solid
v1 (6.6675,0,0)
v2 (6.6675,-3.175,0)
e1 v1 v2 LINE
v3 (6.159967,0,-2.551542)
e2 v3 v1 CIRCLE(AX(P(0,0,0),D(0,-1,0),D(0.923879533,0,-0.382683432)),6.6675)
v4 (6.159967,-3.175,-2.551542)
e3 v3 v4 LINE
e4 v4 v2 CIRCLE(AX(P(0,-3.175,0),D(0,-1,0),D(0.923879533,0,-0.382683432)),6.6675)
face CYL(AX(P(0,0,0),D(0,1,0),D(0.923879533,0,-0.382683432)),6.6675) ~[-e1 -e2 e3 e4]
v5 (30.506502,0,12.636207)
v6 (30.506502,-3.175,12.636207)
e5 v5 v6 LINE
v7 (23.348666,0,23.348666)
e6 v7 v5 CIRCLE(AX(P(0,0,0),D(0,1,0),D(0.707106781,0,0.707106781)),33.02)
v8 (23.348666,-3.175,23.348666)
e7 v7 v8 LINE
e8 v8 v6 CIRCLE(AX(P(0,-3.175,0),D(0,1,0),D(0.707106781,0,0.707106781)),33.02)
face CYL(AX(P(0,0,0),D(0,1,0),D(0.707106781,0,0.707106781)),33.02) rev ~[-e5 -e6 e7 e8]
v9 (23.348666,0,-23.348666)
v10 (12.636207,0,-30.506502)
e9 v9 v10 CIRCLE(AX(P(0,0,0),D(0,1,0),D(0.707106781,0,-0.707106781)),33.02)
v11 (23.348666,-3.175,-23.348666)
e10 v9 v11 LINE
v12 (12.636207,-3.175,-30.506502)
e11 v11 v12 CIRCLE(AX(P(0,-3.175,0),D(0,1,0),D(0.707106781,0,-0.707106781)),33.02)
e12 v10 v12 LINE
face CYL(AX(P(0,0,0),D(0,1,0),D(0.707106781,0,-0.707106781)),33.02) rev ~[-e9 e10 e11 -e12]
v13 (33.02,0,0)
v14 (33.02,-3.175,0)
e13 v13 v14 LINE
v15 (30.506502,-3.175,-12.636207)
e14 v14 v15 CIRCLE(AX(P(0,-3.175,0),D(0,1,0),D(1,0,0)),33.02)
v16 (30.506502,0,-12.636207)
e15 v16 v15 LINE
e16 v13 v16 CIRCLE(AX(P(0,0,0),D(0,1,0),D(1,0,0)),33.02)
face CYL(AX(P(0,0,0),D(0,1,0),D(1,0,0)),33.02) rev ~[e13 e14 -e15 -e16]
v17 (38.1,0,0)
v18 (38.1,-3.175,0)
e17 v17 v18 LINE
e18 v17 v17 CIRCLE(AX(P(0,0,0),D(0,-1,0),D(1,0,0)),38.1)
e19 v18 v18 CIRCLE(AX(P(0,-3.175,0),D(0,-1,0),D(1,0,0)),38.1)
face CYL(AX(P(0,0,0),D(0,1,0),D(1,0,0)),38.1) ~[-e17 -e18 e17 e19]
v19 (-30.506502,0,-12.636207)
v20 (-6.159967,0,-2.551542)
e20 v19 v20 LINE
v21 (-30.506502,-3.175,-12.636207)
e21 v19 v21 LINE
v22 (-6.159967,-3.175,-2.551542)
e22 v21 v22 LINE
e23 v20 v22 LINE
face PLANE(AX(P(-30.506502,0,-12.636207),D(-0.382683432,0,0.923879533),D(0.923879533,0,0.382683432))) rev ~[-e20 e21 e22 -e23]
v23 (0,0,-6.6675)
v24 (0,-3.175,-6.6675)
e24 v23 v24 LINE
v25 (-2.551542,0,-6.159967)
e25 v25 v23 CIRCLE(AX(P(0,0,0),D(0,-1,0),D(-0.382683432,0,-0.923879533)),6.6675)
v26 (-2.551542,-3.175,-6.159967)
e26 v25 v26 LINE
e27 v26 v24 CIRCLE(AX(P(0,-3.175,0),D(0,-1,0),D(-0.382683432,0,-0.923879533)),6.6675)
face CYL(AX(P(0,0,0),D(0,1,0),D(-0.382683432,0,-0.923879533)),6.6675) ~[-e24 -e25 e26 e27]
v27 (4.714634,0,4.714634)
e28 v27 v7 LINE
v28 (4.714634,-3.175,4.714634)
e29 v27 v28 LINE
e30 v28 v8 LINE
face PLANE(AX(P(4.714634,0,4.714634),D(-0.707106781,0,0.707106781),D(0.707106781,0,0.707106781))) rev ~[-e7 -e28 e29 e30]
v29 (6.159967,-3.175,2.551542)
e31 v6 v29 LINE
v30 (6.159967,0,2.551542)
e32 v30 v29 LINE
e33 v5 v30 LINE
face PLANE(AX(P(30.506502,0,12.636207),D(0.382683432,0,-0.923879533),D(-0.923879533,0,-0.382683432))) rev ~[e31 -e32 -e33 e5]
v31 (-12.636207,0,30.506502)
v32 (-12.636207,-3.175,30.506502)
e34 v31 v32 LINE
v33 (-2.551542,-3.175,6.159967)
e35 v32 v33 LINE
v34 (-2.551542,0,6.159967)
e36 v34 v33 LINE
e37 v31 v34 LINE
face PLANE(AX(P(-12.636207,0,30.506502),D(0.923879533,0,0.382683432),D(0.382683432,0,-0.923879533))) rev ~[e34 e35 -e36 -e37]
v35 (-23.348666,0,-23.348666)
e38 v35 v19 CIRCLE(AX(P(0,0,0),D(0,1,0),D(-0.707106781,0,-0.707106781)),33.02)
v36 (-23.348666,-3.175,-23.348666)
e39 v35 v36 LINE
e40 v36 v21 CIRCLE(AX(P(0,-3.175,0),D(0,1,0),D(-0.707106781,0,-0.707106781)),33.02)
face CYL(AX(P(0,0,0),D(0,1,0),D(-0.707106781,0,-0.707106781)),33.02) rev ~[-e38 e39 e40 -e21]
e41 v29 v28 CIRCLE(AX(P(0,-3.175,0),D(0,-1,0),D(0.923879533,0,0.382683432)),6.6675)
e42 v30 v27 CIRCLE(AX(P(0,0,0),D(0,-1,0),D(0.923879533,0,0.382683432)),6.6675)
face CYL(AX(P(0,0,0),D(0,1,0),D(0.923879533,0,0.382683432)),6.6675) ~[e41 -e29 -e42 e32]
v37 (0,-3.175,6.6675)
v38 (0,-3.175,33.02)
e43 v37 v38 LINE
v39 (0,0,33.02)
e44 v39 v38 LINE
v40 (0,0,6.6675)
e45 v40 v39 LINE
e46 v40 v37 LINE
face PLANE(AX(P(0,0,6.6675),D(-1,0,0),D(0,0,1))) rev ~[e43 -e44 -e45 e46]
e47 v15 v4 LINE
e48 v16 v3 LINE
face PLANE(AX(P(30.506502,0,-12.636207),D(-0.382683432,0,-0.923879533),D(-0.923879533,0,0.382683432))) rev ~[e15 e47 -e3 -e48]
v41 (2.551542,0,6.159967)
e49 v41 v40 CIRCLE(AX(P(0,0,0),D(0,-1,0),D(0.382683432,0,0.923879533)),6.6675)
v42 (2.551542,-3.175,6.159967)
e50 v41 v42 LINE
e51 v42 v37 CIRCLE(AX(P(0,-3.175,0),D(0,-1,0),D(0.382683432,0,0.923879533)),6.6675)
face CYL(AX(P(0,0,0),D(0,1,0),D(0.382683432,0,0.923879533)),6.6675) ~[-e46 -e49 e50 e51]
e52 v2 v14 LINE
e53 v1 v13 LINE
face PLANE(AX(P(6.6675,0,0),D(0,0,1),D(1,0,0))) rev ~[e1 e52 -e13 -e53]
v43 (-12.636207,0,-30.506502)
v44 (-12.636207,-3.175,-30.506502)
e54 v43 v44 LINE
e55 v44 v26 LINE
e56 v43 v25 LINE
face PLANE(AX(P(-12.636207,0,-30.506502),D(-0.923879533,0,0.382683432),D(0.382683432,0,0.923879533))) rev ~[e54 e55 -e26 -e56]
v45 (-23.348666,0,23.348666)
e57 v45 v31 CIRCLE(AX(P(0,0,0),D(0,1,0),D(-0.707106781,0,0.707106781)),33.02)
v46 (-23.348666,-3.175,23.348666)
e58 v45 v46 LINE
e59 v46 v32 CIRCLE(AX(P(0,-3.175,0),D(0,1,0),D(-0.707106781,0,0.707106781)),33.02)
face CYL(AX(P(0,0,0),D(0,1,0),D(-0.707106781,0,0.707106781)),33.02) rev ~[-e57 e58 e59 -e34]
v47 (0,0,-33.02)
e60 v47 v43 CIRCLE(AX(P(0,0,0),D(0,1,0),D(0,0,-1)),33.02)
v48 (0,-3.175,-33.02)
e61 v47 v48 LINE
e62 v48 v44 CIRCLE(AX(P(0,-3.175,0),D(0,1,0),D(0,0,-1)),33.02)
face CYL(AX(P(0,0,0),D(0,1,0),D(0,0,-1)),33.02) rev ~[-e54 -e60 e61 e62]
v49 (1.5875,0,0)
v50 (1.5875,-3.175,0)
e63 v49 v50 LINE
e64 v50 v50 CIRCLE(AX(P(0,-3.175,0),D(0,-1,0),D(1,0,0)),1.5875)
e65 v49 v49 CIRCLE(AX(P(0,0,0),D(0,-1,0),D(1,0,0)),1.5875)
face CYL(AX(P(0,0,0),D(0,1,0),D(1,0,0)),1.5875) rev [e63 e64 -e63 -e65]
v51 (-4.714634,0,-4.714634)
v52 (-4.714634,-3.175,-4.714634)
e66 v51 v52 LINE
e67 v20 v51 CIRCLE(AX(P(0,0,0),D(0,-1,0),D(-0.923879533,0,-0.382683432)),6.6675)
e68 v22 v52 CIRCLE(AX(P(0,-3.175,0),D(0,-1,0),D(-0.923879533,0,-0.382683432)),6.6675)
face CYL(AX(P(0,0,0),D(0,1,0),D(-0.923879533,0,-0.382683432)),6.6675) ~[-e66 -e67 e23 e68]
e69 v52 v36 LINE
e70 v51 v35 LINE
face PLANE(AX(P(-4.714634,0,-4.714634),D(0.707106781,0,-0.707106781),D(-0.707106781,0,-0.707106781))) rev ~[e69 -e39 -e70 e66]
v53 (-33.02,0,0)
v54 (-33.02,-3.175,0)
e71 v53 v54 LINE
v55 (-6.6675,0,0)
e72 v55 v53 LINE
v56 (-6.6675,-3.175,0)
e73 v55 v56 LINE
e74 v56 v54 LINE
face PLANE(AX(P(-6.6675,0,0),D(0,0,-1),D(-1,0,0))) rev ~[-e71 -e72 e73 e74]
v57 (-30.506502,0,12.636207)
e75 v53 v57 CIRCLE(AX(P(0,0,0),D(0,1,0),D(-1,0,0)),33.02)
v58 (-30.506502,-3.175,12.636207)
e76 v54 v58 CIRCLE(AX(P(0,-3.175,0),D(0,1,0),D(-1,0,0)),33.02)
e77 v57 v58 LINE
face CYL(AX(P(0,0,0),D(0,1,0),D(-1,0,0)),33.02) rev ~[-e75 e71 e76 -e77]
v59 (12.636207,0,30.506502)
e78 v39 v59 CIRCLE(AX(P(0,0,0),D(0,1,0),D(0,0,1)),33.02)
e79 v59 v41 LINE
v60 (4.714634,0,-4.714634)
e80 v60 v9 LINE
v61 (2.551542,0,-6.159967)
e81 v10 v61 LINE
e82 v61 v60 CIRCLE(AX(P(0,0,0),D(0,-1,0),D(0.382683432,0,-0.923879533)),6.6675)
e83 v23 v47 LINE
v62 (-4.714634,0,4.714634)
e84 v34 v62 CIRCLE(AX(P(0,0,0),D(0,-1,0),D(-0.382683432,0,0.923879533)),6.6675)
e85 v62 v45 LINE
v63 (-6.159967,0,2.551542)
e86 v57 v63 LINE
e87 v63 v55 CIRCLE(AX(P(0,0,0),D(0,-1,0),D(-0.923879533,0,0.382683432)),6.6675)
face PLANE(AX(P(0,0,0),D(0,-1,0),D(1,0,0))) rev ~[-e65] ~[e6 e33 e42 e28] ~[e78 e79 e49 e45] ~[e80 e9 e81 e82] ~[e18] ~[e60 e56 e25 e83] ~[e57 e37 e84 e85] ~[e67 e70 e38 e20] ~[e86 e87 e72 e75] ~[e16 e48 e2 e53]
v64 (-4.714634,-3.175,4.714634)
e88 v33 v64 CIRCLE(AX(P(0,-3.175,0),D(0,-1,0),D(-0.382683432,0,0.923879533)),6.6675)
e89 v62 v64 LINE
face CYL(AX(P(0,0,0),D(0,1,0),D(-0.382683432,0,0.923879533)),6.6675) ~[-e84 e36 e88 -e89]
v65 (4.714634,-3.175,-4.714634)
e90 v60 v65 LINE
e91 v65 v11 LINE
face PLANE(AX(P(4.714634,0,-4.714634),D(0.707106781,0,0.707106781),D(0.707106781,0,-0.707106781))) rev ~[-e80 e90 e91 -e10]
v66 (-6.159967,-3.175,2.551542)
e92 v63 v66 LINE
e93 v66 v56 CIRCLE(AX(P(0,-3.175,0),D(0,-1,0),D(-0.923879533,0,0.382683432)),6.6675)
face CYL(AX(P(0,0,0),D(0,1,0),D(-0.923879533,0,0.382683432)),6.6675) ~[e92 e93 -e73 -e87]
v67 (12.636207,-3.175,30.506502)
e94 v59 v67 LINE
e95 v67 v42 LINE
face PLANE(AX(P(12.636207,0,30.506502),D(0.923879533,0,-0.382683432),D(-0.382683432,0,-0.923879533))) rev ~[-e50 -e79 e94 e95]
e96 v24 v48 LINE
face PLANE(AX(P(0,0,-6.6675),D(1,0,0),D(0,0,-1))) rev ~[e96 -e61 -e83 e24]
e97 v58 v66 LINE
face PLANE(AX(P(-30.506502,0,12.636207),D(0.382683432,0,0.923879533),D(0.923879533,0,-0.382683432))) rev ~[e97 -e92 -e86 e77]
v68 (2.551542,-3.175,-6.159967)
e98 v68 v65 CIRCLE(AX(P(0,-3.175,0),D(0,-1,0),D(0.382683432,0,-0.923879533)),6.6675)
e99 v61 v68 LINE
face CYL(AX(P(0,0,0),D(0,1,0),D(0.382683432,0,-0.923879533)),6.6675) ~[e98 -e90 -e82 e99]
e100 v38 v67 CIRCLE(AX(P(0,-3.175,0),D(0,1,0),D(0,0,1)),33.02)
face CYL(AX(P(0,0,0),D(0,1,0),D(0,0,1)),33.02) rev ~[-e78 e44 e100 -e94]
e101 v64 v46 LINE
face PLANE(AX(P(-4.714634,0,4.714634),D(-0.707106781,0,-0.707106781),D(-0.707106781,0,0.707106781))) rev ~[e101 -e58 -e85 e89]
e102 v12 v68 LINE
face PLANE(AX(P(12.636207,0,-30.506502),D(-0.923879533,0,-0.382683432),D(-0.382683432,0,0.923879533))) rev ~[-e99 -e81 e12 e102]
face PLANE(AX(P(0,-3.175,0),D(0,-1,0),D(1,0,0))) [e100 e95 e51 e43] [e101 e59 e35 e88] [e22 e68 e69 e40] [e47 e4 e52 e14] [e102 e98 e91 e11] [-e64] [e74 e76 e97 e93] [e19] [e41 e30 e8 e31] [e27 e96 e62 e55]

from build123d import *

# Parameters (mm, degrees)
F0_R     = 38.1
F0_R_2   = 1.5875
F1_DEPTH = 3.175
F2_DEPTH = 3.175


# Not quite as in the source:
# - a feature names something its author has since deleted; it is built from what else it names


with BuildPart() as f1:
    # F0 (on Front) → F1 (new body)
    with BuildSketch(Plane.XZ):
        Circle(F0_R)
        with BuildLine():
            ThreePointArc((30.5065021635, 12.6362069367), (32.3855299589, 6.441882433), (33.02, 0))
            ThreePointArc((33.02, 0), (32.3855299589, -6.441882433), (30.5065021635, -12.6362069367))
            ThreePointArc((30.5065021635, -12.6362069367), (27.4551265982, -18.3449290943), (23.3486659148, -23.3486659148))
            ThreePointArc((23.3486659148, -23.3486659148), (18.3449290943, -27.4551265982), (12.6362069367, -30.5065021635))
            ThreePointArc((12.6362069367, -30.5065021635), (6.441882433, -32.3855299589), (0, -33.02))
            ThreePointArc((0, -33.02), (-6.441882433, -32.3855299589), (-12.6362069367, -30.5065021635))
            ThreePointArc((-12.6362069367, -30.5065021635), (-18.3449290943, -27.4551265982), (-23.3486659148, -23.3486659148))
            ThreePointArc((-23.3486659148, -23.3486659148), (-27.4551265982, -18.3449290943), (-30.5065021635, -12.6362069367))
            ThreePointArc((-30.5065021635, -12.6362069367), (-32.3855299589, -6.441882433), (-33.02, 0))
            ThreePointArc((-33.02, 0), (-32.3855299589, 6.441882433), (-30.5065021635, 12.6362069367))
            ThreePointArc((-30.5065021635, 12.6362069367), (-27.4551265982, 18.3449290943), (-23.3486659148, 23.3486659148))
            ThreePointArc((-23.3486659148, 23.3486659148), (-18.3449290943, 27.4551265982), (-12.6362069367, 30.5065021635))
            ThreePointArc((-12.6362069367, 30.5065021635), (-6.441882433, 32.3855299589), (0, 33.02))
            ThreePointArc((0, 33.02), (6.441882433, 32.3855299589), (12.6362069367, 30.5065021635))
            ThreePointArc((12.6362069367, 30.5065021635), (18.3449290943, 27.4551265982), (23.3486659148, 23.3486659148))
            ThreePointArc((23.3486659148, 23.3486659148), (27.4551265982, 18.3449290943), (30.5065021635, 12.6362069367))
        make_face(mode=Mode.SUBTRACT)
        with BuildLine():
            ThreePointArc((6.159966783, -2.5515417853), (6.5393858571, -1.300764722), (6.6675, 0))
            ThreePointArc((6.6675, 0), (6.5393858571, 1.300764722), (6.159966783, 2.5515417853))
            ThreePointArc((6.159966783, 2.5515417853), (5.54382364, 3.7042645287), (4.7146344636, 4.7146344636))
            ThreePointArc((4.7146344636, 4.7146344636), (3.7042645287, 5.54382364), (2.5515417853, 6.159966783))
            ThreePointArc((2.5515417853, 6.159966783), (1.300764722, 6.5393858571), (0, 6.6675))
            ThreePointArc((0, 6.6675), (-1.300764722, 6.5393858571), (-2.5515417853, 6.159966783))
            ThreePointArc((-2.5515417853, 6.159966783), (-3.7042645287, 5.54382364), (-4.7146344636, 4.7146344636))
            ThreePointArc((-4.7146344636, 4.7146344636), (-5.54382364, 3.7042645287), (-6.159966783, 2.5515417853))
            ThreePointArc((-6.159966783, 2.5515417853), (-6.5393858571, 1.300764722), (-6.6675, 0))
            ThreePointArc((-6.6675, 0), (-6.5393858571, -1.300764722), (-6.159966783, -2.5515417853))
            ThreePointArc((-6.159966783, -2.5515417853), (-5.54382364, -3.7042645287), (-4.7146344636, -4.7146344636))
            ThreePointArc((-4.7146344636, -4.7146344636), (-3.7042645287, -5.54382364), (-2.5515417853, -6.159966783))
            ThreePointArc((-2.5515417853, -6.159966783), (-1.300764722, -6.5393858571), (0, -6.6675))
            ThreePointArc((0, -6.6675), (1.300764722, -6.5393858571), (2.5515417853, -6.159966783))
            ThreePointArc((2.5515417853, -6.159966783), (3.7042645287, -5.54382364), (4.7146344636, -4.7146344636))
            ThreePointArc((4.7146344636, -4.7146344636), (5.54382364, -3.7042645287), (6.159966783, -2.5515417853))
        make_face()
        Circle(F0_R_2, mode=Mode.SUBTRACT)
        with BuildLine():
            ThreePointArc((0, -33.02), (6.441882433, -32.3855299589), (12.6362069367, -30.5065021635))
            Line((12.6362069367, -30.5065021635), (2.5515417853, -6.159966783))
            ThreePointArc((2.5515417853, -6.159966783), (1.300764722, -6.5393858571), (0, -6.6675))
            Line((0, -6.6675), (0, -33.02))
        make_face()
    extrude(amount=F1_DEPTH)

    # F0 (on Front) → F2 (join)
    with BuildSketch(Plane.XZ):
        Circle(F0_R)
        with BuildLine():
            ThreePointArc((30.5065021635, 12.6362069367), (32.3855299589, 6.441882433), (33.02, 0))
            ThreePointArc((33.02, 0), (32.3855299589, -6.441882433), (30.5065021635, -12.6362069367))
            ThreePointArc((30.5065021635, -12.6362069367), (27.4551265982, -18.3449290943), (23.3486659148, -23.3486659148))
            ThreePointArc((23.3486659148, -23.3486659148), (18.3449290943, -27.4551265982), (12.6362069367, -30.5065021635))
            ThreePointArc((12.6362069367, -30.5065021635), (6.441882433, -32.3855299589), (0, -33.02))
            ThreePointArc((0, -33.02), (-6.441882433, -32.3855299589), (-12.6362069367, -30.5065021635))
            ThreePointArc((-12.6362069367, -30.5065021635), (-18.3449290943, -27.4551265982), (-23.3486659148, -23.3486659148))
            ThreePointArc((-23.3486659148, -23.3486659148), (-27.4551265982, -18.3449290943), (-30.5065021635, -12.6362069367))
            ThreePointArc((-30.5065021635, -12.6362069367), (-32.3855299589, -6.441882433), (-33.02, 0))
            ThreePointArc((-33.02, 0), (-32.3855299589, 6.441882433), (-30.5065021635, 12.6362069367))
            ThreePointArc((-30.5065021635, 12.6362069367), (-27.4551265982, 18.3449290943), (-23.3486659148, 23.3486659148))
            ThreePointArc((-23.3486659148, 23.3486659148), (-18.3449290943, 27.4551265982), (-12.6362069367, 30.5065021635))
            ThreePointArc((-12.6362069367, 30.5065021635), (-6.441882433, 32.3855299589), (0, 33.02))
            ThreePointArc((0, 33.02), (6.441882433, 32.3855299589), (12.6362069367, 30.5065021635))
            ThreePointArc((12.6362069367, 30.5065021635), (18.3449290943, 27.4551265982), (23.3486659148, 23.3486659148))
            ThreePointArc((23.3486659148, 23.3486659148), (27.4551265982, 18.3449290943), (30.5065021635, 12.6362069367))
        make_face(mode=Mode.SUBTRACT)
        with BuildLine():
            ThreePointArc((-23.3486659148, -23.3486659148), (-18.3449290943, -27.4551265982), (-12.6362069367, -30.5065021635))
            Line((-12.6362069367, -30.5065021635), (-2.5515417853, -6.159966783))
            ThreePointArc((-2.5515417853, -6.159966783), (-3.7042645287, -5.54382364), (-4.7146344636, -4.7146344636))
            Line((-4.7146344636, -4.7146344636), (-23.3486659148, -23.3486659148))
        make_face()
        with BuildLine():
            ThreePointArc((-33.02, 0), (-32.3855299589, -6.441882433), (-30.5065021635, -12.6362069367))
            Line((-30.5065021635, -12.6362069367), (-6.159966783, -2.5515417853))
            ThreePointArc((-6.159966783, -2.5515417853), (-6.5393858571, -1.300764722), (-6.6675, 0))
            Line((-6.6675, 0), (-33.02, 0))
        make_face()
        with BuildLine():
            Line((-4.7146344636, 4.7146344636), (-23.3486659148, 23.3486659148))
            ThreePointArc((-23.3486659148, 23.3486659148), (-27.4551265982, 18.3449290943), (-30.5065021635, 12.6362069367))
            Line((-30.5065021635, 12.6362069367), (-6.159966783, 2.5515417853))
            ThreePointArc((-6.159966783, 2.5515417853), (-5.54382364, 3.7042645287), (-4.7146344636, 4.7146344636))
        make_face()
        with BuildLine():
            Line((0, 6.6675), (0, 33.02))
            ThreePointArc((0, 33.02), (-6.441882433, 32.3855299589), (-12.6362069367, 30.5065021635))
            Line((-12.6362069367, 30.5065021635), (-2.5515417853, 6.159966783))
            ThreePointArc((-2.5515417853, 6.159966783), (-1.300764722, 6.5393858571), (0, 6.6675))
        make_face()
        with BuildLine():
            Line((4.7146344636, 4.7146344636), (23.3486659148, 23.3486659148))
            ThreePointArc((23.3486659148, 23.3486659148), (18.3449290943, 27.4551265982), (12.6362069367, 30.5065021635))
            Line((12.6362069367, 30.5065021635), (2.5515417853, 6.159966783))
            ThreePointArc((2.5515417853, 6.159966783), (3.7042645287, 5.54382364), (4.7146344636, 4.7146344636))
        make_face()
        with BuildLine():
            Line((6.6675, 0), (33.02, 0))
            ThreePointArc((33.02, 0), (32.3855299589, 6.441882433), (30.5065021635, 12.6362069367))
            Line((30.5065021635, 12.6362069367), (6.159966783, 2.5515417853))
            ThreePointArc((6.159966783, 2.5515417853), (6.5393858571, 1.300764722), (6.6675, 0))
        make_face()
        with BuildLine():
            ThreePointArc((23.3486659148, -23.3486659148), (27.4551265982, -18.3449290943), (30.5065021635, -12.6362069367))
            Line((30.5065021635, -12.6362069367), (6.159966783, -2.5515417853))
            ThreePointArc((6.159966783, -2.5515417853), (5.54382364, -3.7042645287), (4.7146344636, -4.7146344636))
            Line((4.7146344636, -4.7146344636), (23.3486659148, -23.3486659148))
        make_face()
    extrude(amount=F2_DEPTH)


solid = f1.part
